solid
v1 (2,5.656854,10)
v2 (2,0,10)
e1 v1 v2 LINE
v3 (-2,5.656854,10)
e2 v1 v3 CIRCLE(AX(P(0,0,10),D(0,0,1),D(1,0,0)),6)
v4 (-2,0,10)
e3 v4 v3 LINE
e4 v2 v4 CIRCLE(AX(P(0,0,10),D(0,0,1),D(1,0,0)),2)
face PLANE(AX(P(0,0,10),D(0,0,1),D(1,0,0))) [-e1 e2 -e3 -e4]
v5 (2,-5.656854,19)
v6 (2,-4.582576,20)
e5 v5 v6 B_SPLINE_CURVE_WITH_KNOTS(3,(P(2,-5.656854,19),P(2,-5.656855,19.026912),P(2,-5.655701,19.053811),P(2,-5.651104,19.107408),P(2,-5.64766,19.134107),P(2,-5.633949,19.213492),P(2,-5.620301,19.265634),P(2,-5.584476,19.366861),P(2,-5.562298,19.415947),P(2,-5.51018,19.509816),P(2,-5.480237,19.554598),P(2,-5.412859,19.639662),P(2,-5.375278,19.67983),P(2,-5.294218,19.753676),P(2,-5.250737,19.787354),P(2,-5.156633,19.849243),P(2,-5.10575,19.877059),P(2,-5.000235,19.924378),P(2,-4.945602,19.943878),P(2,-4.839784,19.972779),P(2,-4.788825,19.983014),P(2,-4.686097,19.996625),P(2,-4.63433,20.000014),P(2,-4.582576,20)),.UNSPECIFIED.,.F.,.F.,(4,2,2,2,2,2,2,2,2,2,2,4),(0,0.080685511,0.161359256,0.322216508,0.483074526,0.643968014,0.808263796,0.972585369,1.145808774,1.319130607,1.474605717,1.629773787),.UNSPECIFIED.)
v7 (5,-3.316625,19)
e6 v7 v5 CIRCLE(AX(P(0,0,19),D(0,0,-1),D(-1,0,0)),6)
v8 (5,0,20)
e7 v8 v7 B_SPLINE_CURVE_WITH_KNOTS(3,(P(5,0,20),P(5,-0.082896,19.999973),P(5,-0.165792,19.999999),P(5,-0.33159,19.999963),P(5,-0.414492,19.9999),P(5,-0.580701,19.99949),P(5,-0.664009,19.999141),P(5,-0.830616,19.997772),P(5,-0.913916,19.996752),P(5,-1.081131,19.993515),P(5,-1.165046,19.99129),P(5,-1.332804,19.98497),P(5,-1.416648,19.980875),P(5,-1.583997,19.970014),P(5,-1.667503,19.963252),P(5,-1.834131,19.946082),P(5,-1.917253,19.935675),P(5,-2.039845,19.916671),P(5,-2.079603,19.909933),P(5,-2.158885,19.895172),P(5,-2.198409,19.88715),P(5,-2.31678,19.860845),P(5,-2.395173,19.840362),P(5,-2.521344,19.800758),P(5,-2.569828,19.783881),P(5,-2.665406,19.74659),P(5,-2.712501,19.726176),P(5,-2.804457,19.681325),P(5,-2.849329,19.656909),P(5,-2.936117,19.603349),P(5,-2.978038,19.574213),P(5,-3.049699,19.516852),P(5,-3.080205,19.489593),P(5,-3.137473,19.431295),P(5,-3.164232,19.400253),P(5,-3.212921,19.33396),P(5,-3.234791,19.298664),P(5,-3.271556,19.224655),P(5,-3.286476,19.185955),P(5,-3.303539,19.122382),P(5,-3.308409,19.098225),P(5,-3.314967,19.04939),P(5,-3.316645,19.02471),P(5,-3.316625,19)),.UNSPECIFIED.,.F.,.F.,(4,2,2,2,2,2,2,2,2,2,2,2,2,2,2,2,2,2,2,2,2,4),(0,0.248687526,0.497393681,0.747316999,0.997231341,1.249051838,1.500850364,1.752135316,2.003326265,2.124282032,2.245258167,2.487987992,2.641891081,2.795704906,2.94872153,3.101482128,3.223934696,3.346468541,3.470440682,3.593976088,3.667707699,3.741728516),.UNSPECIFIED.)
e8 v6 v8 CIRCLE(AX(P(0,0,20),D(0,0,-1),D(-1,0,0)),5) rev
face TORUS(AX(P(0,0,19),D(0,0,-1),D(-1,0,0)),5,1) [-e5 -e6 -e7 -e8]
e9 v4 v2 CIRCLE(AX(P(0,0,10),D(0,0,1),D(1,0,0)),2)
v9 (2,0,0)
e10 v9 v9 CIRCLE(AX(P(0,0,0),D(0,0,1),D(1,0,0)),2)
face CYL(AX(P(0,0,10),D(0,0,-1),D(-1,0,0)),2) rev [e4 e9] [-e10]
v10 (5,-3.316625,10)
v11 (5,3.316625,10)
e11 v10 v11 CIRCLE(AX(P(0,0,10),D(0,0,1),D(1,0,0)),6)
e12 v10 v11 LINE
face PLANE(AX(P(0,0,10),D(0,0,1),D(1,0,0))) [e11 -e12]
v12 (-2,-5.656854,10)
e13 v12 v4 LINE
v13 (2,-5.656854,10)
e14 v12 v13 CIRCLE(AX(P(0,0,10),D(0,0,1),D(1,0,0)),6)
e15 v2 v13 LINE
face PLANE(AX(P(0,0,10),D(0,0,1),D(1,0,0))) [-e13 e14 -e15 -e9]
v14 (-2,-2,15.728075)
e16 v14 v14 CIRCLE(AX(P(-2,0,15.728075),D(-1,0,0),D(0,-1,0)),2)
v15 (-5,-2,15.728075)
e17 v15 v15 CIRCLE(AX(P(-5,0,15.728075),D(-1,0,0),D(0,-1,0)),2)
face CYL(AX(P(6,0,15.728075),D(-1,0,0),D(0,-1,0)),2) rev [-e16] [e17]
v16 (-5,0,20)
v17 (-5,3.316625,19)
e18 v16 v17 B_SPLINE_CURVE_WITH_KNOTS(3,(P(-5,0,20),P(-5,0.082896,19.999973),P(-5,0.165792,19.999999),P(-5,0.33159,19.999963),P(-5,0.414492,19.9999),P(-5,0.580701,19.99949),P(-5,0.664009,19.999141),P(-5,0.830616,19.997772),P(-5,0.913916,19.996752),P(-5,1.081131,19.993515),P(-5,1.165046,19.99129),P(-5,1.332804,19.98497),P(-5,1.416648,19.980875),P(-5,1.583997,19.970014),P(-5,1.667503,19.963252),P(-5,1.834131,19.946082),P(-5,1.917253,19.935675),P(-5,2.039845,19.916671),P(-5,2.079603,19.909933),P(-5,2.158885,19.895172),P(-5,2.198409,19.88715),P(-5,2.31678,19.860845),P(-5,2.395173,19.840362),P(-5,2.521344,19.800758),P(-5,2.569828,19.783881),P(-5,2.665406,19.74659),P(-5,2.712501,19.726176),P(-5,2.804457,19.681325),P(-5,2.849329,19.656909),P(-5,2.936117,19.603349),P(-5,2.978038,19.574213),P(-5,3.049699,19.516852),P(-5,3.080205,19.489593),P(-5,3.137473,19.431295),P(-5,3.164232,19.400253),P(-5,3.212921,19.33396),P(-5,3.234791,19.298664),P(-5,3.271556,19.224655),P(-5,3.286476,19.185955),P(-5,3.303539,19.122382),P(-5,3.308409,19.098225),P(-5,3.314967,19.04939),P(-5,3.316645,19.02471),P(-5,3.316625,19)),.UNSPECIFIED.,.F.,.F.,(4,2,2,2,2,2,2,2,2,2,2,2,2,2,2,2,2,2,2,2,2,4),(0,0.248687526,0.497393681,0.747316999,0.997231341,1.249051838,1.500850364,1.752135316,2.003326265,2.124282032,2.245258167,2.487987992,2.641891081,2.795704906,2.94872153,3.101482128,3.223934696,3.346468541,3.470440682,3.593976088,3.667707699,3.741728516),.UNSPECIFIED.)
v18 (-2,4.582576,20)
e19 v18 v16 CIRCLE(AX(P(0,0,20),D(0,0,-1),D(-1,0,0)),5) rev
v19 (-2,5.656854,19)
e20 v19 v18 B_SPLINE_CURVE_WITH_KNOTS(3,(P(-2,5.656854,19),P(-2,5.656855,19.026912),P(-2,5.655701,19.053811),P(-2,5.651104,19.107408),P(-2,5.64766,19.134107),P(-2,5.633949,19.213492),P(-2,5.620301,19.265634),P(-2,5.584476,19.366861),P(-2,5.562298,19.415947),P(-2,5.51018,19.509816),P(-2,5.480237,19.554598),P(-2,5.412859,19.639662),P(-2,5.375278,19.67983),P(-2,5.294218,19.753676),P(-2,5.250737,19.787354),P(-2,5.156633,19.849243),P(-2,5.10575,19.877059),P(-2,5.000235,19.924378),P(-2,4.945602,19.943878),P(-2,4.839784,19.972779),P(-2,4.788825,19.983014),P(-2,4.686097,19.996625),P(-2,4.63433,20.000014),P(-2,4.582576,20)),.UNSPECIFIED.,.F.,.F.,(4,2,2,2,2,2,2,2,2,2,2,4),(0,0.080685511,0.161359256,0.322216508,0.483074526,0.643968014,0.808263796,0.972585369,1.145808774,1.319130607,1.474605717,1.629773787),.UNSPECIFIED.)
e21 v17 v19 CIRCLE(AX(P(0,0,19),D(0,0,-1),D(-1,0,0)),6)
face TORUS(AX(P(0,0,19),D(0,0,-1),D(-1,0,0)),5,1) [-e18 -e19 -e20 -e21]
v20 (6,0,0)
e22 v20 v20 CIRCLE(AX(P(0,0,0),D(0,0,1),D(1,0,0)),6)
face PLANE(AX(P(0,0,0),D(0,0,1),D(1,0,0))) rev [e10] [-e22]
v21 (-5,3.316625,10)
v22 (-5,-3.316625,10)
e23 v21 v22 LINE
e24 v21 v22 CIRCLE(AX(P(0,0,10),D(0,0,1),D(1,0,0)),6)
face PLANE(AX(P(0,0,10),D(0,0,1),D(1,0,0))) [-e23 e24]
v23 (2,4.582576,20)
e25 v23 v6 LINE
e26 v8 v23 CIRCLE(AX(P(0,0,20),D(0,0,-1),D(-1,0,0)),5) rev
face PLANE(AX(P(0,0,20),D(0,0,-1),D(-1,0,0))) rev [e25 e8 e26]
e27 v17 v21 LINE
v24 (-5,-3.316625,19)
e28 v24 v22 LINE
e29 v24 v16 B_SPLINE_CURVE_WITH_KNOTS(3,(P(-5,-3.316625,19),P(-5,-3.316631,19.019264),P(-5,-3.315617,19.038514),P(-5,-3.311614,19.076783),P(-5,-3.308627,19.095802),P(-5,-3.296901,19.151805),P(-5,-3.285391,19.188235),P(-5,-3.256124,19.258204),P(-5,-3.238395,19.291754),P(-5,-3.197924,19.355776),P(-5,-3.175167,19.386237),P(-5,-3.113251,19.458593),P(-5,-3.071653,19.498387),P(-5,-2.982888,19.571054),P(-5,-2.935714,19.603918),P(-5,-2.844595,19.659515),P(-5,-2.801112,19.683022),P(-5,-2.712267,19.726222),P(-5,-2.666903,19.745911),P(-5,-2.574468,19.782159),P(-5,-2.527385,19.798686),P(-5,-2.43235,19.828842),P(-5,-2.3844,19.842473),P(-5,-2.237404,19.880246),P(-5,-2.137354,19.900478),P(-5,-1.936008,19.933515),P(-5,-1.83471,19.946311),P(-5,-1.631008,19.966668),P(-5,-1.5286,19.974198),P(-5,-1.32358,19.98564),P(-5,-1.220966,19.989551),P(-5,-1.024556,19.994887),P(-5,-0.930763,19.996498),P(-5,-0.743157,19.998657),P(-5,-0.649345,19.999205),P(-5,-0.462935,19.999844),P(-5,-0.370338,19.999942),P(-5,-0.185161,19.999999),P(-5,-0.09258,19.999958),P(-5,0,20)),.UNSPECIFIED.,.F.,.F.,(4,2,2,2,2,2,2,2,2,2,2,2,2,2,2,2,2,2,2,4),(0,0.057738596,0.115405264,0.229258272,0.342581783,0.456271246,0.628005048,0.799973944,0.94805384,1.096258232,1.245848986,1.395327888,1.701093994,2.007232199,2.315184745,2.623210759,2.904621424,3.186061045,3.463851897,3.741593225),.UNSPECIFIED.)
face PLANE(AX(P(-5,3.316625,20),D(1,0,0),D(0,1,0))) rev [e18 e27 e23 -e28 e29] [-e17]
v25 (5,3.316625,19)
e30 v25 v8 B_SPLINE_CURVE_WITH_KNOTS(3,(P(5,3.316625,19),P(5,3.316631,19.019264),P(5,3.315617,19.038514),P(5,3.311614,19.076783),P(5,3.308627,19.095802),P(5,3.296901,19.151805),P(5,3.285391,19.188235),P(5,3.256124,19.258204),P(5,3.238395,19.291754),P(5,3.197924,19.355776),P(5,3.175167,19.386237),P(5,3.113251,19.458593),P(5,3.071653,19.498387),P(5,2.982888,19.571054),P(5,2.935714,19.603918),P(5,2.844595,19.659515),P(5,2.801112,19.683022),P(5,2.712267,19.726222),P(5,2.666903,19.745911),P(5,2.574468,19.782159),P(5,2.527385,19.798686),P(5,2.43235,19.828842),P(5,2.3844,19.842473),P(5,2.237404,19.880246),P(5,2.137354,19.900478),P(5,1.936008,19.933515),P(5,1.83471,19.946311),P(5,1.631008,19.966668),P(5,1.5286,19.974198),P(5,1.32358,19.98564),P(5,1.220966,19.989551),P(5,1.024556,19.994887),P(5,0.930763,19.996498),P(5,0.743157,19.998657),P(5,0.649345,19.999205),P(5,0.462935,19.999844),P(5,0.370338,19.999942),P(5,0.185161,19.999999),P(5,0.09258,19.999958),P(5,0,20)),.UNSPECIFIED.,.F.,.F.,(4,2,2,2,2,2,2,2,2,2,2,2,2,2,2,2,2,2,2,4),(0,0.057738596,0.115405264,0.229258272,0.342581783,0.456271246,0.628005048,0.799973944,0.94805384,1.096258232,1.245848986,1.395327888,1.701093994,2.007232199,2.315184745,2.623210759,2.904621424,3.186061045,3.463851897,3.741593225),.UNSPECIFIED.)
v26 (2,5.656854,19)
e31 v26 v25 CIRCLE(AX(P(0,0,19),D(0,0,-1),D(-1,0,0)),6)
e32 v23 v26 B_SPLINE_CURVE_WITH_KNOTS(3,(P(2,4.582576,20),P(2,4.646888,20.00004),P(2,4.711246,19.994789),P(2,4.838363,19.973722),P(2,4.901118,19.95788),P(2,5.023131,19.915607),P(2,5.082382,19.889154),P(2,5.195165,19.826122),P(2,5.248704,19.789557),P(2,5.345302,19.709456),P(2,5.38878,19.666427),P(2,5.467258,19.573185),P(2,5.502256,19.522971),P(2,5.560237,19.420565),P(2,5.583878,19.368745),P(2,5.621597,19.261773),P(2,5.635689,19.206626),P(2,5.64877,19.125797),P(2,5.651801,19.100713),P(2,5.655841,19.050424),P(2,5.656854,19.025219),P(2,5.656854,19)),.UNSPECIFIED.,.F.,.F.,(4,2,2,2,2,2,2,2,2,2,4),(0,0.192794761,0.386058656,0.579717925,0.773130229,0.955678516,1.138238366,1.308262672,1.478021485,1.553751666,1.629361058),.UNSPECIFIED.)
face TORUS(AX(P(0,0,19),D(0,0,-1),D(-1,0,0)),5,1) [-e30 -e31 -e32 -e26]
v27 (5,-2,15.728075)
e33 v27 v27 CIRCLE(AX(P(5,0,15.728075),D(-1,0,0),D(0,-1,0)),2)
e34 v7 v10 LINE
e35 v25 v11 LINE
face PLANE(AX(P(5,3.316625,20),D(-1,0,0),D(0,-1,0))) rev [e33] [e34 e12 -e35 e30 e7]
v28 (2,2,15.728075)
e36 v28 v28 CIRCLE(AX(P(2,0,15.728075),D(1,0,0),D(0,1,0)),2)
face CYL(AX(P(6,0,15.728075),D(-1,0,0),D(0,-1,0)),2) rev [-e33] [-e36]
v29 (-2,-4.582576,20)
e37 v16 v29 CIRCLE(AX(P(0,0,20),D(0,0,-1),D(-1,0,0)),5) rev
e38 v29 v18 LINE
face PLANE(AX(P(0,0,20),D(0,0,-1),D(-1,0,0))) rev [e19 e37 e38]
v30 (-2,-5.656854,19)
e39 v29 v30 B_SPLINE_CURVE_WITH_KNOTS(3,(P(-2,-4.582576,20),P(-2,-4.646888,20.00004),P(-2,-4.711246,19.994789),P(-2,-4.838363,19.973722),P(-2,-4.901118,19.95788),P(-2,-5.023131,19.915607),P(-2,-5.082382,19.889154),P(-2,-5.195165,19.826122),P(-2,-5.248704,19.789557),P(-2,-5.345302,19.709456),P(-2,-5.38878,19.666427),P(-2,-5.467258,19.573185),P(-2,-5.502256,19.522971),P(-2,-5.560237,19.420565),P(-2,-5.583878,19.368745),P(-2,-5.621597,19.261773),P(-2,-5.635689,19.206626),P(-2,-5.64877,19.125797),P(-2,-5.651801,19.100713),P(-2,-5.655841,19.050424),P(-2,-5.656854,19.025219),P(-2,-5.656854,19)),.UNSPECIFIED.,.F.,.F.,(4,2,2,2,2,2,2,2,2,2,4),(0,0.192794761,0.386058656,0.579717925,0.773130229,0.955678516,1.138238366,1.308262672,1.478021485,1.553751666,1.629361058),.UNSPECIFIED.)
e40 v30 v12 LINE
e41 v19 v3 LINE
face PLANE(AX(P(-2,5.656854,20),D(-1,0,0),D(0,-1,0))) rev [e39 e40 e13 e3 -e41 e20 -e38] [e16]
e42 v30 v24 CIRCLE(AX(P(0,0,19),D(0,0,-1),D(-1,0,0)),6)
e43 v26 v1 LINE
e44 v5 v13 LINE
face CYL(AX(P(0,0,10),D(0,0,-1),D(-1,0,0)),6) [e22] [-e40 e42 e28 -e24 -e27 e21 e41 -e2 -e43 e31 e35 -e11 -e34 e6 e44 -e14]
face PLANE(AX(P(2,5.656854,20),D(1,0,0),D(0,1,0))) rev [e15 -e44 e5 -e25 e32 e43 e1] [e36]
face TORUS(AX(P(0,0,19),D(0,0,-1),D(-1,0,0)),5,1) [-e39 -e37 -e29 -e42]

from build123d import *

# Parameters (mm, degrees)
SKETCH_1_R          = 6
SKETCH_1_R_2        = 2
EXTRUDE_1_DEPTH     = 10
EXTRUDE_2_DEPTH     = 10
SKETCH_3_R          = 2
CUT_EXTRUDE_3_DEPTH = 24.600847442
FILLET_1_R          = 1


with BuildPart() as part:
    # Эскиз1 → Вытянуть1 (new body)
    with BuildSketch(Plane.XY):
        Circle(SKETCH_1_R)
        Circle(SKETCH_1_R_2, mode=Mode.SUBTRACT)
    extrude(amount=EXTRUDE_1_DEPTH)

    # Эскиз2 → Вытянуть2 (add)
    with BuildSketch(Plane.XY.offset(10)):
        with BuildLine():
            Line((-5, 3.31662479), (-5, -3.31662479))
            ThreePointArc((-5, -3.31662479), (-3.69041576, -4.730838353), (-2, -5.656854249))
            Line((-2, -5.656854249), (-2, 5.656854249))
            ThreePointArc((-2, 5.656854249), (-3.69041576, 4.730838353), (-5, 3.31662479))
        make_face()
        with BuildLine():
            Line((2, 5.656854249), (2, -5.656854249))
            ThreePointArc((2, -5.656854249), (3.69041576, -4.730838353), (5, -3.31662479))
            Line((5, -3.31662479), (5, 3.31662479))
            ThreePointArc((5, 3.31662479), (3.69041576, 4.730838353), (2, 5.656854249))
        make_face()
    extrude(amount=EXTRUDE_2_DEPTH)

    # Эскиз3 → Вытянуть3 (cut, through all)
    with BuildSketch(Plane.ZY.offset(5)):
        with Locations(Location((15.728074635, 0, 0), (0, 0, 270))):
            Circle(SKETCH_3_R)
    extrude(amount=-CUT_EXTRUDE_3_DEPTH, mode=Mode.SUBTRACT)

    # Скругление1
    fillet_1_edges = [part.edges().sort_by_distance(p)[0] for p in [
        (-3.69041576, 4.730838353, 20),
        (-3.69041576, -4.730838353, 20),
        (3.69041576, -4.730838353, 20),
        (3.69041576, 4.730838353, 20),
    ]]
    fillet(fillet_1_edges, radius=FILLET_1_R - 0.0001)  # a hair under: the kernel refuses the full size


solid = part.part
